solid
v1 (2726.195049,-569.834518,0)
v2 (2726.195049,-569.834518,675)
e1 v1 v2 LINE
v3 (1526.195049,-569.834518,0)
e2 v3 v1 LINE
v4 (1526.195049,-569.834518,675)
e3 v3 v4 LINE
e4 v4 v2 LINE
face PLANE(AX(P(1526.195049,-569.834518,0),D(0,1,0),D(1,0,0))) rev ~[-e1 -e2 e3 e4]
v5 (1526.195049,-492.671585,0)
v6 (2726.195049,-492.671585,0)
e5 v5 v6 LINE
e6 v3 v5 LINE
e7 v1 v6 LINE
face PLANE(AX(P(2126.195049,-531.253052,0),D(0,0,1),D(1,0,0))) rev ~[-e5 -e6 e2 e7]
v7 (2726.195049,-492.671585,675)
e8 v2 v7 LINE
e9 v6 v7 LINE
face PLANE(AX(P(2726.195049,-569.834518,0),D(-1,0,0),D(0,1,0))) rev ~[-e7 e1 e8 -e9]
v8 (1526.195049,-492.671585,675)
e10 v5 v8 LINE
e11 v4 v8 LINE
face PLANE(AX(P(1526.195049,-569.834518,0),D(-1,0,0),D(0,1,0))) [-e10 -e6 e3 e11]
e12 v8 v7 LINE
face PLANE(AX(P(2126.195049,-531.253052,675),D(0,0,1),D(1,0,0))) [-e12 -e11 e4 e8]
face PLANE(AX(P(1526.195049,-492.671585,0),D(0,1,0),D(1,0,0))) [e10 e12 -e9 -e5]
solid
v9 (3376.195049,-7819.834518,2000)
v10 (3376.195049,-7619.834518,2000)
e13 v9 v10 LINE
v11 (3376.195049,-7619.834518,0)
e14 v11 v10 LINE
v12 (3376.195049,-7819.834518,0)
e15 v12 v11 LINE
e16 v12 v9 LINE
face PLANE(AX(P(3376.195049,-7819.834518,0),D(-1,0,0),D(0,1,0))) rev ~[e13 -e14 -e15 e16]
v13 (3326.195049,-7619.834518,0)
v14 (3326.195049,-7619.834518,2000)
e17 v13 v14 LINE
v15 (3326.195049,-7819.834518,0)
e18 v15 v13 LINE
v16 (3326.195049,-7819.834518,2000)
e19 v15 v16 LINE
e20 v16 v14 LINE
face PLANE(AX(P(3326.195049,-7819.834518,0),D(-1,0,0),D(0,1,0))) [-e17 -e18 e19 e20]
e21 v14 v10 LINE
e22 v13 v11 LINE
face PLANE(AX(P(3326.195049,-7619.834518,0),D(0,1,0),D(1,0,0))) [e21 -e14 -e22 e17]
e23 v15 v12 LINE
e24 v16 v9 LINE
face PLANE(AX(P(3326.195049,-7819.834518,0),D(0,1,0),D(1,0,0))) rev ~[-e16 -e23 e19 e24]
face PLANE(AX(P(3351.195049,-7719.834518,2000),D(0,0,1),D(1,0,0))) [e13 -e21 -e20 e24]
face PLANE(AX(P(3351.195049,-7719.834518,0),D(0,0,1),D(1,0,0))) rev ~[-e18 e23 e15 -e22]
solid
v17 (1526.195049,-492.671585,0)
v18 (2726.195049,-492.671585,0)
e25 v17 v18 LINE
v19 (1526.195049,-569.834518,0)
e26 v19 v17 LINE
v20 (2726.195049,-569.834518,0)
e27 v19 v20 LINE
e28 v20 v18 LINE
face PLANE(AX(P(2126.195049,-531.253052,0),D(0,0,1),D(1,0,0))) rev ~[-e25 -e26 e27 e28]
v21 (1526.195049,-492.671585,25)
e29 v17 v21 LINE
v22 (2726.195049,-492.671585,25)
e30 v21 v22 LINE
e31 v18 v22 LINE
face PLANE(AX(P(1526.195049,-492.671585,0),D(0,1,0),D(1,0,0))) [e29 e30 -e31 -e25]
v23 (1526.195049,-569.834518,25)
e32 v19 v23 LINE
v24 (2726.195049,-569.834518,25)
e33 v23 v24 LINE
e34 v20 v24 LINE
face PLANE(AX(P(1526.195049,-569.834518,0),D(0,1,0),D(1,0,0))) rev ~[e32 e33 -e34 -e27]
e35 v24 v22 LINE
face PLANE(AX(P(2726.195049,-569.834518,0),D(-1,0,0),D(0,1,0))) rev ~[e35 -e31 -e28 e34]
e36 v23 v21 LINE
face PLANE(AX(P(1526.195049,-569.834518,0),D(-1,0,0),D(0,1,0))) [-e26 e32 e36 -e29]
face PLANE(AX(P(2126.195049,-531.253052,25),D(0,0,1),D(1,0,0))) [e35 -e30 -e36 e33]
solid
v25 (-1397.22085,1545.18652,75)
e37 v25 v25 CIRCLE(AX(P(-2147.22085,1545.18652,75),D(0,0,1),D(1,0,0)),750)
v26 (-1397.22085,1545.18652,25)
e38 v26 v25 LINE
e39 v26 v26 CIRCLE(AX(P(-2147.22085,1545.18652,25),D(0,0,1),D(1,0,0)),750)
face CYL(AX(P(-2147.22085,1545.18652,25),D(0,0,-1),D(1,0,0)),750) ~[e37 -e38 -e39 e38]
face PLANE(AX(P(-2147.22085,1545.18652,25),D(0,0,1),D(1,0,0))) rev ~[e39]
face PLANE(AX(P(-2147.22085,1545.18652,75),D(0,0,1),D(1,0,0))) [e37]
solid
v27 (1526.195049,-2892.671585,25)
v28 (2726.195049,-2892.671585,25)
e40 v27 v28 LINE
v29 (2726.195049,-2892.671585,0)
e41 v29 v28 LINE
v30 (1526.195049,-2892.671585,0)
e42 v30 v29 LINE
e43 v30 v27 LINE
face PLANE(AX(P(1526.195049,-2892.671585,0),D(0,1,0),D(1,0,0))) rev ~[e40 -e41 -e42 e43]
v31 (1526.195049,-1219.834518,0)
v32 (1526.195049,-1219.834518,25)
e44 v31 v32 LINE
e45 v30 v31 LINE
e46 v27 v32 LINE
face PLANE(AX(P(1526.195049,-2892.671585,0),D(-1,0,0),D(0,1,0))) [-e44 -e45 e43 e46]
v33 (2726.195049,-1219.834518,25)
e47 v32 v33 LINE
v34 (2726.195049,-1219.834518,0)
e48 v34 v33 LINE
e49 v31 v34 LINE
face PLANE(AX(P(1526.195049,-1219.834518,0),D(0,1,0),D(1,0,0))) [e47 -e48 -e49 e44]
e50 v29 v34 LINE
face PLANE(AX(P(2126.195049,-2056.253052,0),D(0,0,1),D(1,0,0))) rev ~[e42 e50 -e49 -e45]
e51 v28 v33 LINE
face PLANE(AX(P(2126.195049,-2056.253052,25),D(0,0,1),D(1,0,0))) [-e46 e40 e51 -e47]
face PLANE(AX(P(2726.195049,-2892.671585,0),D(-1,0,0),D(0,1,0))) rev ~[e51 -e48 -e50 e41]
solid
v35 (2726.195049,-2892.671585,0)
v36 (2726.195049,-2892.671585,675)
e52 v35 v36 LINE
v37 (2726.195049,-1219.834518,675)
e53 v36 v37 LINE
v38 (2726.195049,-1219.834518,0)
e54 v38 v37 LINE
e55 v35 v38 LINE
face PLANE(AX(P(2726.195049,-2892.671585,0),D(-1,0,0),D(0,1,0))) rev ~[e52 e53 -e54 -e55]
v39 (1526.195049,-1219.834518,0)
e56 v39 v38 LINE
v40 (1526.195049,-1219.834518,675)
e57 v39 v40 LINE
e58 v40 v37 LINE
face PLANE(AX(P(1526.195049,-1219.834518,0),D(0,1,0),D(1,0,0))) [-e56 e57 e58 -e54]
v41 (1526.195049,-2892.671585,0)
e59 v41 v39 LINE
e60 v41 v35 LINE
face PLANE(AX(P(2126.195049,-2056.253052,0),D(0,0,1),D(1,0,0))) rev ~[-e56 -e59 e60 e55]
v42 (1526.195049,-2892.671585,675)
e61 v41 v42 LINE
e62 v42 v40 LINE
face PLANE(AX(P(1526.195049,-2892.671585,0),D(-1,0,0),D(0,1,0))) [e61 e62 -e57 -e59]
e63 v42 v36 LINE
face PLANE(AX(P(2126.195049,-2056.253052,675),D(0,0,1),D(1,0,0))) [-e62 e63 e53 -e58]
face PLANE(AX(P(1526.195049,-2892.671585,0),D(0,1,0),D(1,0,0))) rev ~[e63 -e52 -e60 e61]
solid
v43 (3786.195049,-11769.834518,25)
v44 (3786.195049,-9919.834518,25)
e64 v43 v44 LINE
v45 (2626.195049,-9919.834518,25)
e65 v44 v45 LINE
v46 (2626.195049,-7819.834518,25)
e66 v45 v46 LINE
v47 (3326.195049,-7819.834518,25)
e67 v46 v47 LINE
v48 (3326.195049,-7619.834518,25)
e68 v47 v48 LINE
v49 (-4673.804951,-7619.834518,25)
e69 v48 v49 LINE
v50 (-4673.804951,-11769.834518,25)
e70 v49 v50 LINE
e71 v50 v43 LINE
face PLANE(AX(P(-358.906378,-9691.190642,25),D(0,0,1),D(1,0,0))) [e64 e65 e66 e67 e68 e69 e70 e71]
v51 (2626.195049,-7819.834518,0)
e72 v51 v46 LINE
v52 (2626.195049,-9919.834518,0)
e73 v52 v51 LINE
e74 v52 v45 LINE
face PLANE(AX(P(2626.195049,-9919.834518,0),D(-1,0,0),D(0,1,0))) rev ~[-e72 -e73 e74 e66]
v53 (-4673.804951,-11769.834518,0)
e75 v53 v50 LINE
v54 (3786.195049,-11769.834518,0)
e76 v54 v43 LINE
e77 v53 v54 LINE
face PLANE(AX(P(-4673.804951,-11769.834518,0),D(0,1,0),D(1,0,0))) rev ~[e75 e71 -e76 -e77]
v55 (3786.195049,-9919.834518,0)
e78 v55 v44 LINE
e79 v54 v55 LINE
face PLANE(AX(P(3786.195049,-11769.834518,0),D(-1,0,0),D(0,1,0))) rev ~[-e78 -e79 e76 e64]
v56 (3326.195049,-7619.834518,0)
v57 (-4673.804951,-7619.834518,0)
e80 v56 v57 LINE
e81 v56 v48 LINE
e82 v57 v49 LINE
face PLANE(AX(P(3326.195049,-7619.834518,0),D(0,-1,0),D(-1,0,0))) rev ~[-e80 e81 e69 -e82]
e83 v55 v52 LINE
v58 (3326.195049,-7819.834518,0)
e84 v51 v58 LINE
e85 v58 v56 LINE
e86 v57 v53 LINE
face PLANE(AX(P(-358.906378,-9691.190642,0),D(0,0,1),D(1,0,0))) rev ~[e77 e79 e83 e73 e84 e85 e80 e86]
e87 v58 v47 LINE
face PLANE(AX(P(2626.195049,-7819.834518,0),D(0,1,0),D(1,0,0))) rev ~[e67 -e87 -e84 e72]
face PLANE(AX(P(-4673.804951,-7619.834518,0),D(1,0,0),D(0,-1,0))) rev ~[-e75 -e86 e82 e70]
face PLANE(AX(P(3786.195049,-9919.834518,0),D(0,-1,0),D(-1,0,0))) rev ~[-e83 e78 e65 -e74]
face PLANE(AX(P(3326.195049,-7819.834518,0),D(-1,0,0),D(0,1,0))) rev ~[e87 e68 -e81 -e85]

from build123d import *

# Parameters (mm, degrees)
F0_W     = 1200
F0_H     = 77.1629333496
F1_DEPTH = 25
F0_H_2   = 1672.8370666504
F2_DEPTH = 675
F0_W_2   = 50
F0_H_3   = 200
F3_DEPTH = 2000
F4_R     = 750
F5_DEPTH = 50


with BuildPart() as f1:
    # F0 (on Top) → F1 (new body)
    with BuildSketch(Plane.XY):
        with Locations((2126.1950492859, -531.2530517578)):
            Rectangle(F0_W, F0_H)
    extrude(amount=F1_DEPTH)


with BuildPart() as f1b:
    # F0 (on Top) → F1, piece 2 (new body)
    with BuildSketch(Plane.XY):
        with Locations((2126.1950492859, -2056.2530517578)):
            Rectangle(F0_W, F0_H_2)
    extrude(amount=F1_DEPTH)


with BuildPart() as f1c:
    # F0 (on Top) → F1, piece 3 (new body)
    with BuildSketch(Plane.XY):
        Polygon((-2573.8049507141, -11769.8345184326), (3786.1950492859, -11769.8345184326), (3786.1950492859, -9919.8345184326), (2626.1950492859, -9919.8345184326), (2626.1950492859, -7819.8345184326), (3326.1950492859, -7819.8345184326), (3326.1950492859, -7619.8345184326), (-4673.8049507141, -7619.8345184326), (-4673.8049507141, -11769.8345184326), align=None)
    extrude(amount=F1_DEPTH)


with BuildPart() as f2:
    # F0 (on Top) → F2 (new body)
    with BuildSketch(Plane.XY):
        with Locations((2126.1950492859, -2056.2530517578)):
            Rectangle(F0_W, F0_H_2)
    extrude(amount=F2_DEPTH)


with BuildPart() as f2b:
    # F0 (on Top) → F2, piece 2 (new body)
    with BuildSketch(Plane.XY):
        with Locations((2126.1950492859, -531.2530517578)):
            Rectangle(F0_W, F0_H)
    extrude(amount=F2_DEPTH)


with BuildPart() as f3:
    # F0 (on Top) → F3 (new body)
    with BuildSketch(Plane.XY):
        with Locations((3351.1950492859, -7719.8345184326)):
            Rectangle(F0_W_2, F0_H_3)
    extrude(amount=F3_DEPTH)


with BuildPart() as f5:
    # F4 (on face) → F5 (new body)
    with BuildSketch(Plane.XY.offset(25)):
        with Locations((-2147.2208499908, 1545.1865196228)):
            Circle(F4_R)
    extrude(amount=F5_DEPTH)


solid = Compound([f1.part, f1b.part, f1c.part, f2.part, f2b.part, f3.part, f5.part])
